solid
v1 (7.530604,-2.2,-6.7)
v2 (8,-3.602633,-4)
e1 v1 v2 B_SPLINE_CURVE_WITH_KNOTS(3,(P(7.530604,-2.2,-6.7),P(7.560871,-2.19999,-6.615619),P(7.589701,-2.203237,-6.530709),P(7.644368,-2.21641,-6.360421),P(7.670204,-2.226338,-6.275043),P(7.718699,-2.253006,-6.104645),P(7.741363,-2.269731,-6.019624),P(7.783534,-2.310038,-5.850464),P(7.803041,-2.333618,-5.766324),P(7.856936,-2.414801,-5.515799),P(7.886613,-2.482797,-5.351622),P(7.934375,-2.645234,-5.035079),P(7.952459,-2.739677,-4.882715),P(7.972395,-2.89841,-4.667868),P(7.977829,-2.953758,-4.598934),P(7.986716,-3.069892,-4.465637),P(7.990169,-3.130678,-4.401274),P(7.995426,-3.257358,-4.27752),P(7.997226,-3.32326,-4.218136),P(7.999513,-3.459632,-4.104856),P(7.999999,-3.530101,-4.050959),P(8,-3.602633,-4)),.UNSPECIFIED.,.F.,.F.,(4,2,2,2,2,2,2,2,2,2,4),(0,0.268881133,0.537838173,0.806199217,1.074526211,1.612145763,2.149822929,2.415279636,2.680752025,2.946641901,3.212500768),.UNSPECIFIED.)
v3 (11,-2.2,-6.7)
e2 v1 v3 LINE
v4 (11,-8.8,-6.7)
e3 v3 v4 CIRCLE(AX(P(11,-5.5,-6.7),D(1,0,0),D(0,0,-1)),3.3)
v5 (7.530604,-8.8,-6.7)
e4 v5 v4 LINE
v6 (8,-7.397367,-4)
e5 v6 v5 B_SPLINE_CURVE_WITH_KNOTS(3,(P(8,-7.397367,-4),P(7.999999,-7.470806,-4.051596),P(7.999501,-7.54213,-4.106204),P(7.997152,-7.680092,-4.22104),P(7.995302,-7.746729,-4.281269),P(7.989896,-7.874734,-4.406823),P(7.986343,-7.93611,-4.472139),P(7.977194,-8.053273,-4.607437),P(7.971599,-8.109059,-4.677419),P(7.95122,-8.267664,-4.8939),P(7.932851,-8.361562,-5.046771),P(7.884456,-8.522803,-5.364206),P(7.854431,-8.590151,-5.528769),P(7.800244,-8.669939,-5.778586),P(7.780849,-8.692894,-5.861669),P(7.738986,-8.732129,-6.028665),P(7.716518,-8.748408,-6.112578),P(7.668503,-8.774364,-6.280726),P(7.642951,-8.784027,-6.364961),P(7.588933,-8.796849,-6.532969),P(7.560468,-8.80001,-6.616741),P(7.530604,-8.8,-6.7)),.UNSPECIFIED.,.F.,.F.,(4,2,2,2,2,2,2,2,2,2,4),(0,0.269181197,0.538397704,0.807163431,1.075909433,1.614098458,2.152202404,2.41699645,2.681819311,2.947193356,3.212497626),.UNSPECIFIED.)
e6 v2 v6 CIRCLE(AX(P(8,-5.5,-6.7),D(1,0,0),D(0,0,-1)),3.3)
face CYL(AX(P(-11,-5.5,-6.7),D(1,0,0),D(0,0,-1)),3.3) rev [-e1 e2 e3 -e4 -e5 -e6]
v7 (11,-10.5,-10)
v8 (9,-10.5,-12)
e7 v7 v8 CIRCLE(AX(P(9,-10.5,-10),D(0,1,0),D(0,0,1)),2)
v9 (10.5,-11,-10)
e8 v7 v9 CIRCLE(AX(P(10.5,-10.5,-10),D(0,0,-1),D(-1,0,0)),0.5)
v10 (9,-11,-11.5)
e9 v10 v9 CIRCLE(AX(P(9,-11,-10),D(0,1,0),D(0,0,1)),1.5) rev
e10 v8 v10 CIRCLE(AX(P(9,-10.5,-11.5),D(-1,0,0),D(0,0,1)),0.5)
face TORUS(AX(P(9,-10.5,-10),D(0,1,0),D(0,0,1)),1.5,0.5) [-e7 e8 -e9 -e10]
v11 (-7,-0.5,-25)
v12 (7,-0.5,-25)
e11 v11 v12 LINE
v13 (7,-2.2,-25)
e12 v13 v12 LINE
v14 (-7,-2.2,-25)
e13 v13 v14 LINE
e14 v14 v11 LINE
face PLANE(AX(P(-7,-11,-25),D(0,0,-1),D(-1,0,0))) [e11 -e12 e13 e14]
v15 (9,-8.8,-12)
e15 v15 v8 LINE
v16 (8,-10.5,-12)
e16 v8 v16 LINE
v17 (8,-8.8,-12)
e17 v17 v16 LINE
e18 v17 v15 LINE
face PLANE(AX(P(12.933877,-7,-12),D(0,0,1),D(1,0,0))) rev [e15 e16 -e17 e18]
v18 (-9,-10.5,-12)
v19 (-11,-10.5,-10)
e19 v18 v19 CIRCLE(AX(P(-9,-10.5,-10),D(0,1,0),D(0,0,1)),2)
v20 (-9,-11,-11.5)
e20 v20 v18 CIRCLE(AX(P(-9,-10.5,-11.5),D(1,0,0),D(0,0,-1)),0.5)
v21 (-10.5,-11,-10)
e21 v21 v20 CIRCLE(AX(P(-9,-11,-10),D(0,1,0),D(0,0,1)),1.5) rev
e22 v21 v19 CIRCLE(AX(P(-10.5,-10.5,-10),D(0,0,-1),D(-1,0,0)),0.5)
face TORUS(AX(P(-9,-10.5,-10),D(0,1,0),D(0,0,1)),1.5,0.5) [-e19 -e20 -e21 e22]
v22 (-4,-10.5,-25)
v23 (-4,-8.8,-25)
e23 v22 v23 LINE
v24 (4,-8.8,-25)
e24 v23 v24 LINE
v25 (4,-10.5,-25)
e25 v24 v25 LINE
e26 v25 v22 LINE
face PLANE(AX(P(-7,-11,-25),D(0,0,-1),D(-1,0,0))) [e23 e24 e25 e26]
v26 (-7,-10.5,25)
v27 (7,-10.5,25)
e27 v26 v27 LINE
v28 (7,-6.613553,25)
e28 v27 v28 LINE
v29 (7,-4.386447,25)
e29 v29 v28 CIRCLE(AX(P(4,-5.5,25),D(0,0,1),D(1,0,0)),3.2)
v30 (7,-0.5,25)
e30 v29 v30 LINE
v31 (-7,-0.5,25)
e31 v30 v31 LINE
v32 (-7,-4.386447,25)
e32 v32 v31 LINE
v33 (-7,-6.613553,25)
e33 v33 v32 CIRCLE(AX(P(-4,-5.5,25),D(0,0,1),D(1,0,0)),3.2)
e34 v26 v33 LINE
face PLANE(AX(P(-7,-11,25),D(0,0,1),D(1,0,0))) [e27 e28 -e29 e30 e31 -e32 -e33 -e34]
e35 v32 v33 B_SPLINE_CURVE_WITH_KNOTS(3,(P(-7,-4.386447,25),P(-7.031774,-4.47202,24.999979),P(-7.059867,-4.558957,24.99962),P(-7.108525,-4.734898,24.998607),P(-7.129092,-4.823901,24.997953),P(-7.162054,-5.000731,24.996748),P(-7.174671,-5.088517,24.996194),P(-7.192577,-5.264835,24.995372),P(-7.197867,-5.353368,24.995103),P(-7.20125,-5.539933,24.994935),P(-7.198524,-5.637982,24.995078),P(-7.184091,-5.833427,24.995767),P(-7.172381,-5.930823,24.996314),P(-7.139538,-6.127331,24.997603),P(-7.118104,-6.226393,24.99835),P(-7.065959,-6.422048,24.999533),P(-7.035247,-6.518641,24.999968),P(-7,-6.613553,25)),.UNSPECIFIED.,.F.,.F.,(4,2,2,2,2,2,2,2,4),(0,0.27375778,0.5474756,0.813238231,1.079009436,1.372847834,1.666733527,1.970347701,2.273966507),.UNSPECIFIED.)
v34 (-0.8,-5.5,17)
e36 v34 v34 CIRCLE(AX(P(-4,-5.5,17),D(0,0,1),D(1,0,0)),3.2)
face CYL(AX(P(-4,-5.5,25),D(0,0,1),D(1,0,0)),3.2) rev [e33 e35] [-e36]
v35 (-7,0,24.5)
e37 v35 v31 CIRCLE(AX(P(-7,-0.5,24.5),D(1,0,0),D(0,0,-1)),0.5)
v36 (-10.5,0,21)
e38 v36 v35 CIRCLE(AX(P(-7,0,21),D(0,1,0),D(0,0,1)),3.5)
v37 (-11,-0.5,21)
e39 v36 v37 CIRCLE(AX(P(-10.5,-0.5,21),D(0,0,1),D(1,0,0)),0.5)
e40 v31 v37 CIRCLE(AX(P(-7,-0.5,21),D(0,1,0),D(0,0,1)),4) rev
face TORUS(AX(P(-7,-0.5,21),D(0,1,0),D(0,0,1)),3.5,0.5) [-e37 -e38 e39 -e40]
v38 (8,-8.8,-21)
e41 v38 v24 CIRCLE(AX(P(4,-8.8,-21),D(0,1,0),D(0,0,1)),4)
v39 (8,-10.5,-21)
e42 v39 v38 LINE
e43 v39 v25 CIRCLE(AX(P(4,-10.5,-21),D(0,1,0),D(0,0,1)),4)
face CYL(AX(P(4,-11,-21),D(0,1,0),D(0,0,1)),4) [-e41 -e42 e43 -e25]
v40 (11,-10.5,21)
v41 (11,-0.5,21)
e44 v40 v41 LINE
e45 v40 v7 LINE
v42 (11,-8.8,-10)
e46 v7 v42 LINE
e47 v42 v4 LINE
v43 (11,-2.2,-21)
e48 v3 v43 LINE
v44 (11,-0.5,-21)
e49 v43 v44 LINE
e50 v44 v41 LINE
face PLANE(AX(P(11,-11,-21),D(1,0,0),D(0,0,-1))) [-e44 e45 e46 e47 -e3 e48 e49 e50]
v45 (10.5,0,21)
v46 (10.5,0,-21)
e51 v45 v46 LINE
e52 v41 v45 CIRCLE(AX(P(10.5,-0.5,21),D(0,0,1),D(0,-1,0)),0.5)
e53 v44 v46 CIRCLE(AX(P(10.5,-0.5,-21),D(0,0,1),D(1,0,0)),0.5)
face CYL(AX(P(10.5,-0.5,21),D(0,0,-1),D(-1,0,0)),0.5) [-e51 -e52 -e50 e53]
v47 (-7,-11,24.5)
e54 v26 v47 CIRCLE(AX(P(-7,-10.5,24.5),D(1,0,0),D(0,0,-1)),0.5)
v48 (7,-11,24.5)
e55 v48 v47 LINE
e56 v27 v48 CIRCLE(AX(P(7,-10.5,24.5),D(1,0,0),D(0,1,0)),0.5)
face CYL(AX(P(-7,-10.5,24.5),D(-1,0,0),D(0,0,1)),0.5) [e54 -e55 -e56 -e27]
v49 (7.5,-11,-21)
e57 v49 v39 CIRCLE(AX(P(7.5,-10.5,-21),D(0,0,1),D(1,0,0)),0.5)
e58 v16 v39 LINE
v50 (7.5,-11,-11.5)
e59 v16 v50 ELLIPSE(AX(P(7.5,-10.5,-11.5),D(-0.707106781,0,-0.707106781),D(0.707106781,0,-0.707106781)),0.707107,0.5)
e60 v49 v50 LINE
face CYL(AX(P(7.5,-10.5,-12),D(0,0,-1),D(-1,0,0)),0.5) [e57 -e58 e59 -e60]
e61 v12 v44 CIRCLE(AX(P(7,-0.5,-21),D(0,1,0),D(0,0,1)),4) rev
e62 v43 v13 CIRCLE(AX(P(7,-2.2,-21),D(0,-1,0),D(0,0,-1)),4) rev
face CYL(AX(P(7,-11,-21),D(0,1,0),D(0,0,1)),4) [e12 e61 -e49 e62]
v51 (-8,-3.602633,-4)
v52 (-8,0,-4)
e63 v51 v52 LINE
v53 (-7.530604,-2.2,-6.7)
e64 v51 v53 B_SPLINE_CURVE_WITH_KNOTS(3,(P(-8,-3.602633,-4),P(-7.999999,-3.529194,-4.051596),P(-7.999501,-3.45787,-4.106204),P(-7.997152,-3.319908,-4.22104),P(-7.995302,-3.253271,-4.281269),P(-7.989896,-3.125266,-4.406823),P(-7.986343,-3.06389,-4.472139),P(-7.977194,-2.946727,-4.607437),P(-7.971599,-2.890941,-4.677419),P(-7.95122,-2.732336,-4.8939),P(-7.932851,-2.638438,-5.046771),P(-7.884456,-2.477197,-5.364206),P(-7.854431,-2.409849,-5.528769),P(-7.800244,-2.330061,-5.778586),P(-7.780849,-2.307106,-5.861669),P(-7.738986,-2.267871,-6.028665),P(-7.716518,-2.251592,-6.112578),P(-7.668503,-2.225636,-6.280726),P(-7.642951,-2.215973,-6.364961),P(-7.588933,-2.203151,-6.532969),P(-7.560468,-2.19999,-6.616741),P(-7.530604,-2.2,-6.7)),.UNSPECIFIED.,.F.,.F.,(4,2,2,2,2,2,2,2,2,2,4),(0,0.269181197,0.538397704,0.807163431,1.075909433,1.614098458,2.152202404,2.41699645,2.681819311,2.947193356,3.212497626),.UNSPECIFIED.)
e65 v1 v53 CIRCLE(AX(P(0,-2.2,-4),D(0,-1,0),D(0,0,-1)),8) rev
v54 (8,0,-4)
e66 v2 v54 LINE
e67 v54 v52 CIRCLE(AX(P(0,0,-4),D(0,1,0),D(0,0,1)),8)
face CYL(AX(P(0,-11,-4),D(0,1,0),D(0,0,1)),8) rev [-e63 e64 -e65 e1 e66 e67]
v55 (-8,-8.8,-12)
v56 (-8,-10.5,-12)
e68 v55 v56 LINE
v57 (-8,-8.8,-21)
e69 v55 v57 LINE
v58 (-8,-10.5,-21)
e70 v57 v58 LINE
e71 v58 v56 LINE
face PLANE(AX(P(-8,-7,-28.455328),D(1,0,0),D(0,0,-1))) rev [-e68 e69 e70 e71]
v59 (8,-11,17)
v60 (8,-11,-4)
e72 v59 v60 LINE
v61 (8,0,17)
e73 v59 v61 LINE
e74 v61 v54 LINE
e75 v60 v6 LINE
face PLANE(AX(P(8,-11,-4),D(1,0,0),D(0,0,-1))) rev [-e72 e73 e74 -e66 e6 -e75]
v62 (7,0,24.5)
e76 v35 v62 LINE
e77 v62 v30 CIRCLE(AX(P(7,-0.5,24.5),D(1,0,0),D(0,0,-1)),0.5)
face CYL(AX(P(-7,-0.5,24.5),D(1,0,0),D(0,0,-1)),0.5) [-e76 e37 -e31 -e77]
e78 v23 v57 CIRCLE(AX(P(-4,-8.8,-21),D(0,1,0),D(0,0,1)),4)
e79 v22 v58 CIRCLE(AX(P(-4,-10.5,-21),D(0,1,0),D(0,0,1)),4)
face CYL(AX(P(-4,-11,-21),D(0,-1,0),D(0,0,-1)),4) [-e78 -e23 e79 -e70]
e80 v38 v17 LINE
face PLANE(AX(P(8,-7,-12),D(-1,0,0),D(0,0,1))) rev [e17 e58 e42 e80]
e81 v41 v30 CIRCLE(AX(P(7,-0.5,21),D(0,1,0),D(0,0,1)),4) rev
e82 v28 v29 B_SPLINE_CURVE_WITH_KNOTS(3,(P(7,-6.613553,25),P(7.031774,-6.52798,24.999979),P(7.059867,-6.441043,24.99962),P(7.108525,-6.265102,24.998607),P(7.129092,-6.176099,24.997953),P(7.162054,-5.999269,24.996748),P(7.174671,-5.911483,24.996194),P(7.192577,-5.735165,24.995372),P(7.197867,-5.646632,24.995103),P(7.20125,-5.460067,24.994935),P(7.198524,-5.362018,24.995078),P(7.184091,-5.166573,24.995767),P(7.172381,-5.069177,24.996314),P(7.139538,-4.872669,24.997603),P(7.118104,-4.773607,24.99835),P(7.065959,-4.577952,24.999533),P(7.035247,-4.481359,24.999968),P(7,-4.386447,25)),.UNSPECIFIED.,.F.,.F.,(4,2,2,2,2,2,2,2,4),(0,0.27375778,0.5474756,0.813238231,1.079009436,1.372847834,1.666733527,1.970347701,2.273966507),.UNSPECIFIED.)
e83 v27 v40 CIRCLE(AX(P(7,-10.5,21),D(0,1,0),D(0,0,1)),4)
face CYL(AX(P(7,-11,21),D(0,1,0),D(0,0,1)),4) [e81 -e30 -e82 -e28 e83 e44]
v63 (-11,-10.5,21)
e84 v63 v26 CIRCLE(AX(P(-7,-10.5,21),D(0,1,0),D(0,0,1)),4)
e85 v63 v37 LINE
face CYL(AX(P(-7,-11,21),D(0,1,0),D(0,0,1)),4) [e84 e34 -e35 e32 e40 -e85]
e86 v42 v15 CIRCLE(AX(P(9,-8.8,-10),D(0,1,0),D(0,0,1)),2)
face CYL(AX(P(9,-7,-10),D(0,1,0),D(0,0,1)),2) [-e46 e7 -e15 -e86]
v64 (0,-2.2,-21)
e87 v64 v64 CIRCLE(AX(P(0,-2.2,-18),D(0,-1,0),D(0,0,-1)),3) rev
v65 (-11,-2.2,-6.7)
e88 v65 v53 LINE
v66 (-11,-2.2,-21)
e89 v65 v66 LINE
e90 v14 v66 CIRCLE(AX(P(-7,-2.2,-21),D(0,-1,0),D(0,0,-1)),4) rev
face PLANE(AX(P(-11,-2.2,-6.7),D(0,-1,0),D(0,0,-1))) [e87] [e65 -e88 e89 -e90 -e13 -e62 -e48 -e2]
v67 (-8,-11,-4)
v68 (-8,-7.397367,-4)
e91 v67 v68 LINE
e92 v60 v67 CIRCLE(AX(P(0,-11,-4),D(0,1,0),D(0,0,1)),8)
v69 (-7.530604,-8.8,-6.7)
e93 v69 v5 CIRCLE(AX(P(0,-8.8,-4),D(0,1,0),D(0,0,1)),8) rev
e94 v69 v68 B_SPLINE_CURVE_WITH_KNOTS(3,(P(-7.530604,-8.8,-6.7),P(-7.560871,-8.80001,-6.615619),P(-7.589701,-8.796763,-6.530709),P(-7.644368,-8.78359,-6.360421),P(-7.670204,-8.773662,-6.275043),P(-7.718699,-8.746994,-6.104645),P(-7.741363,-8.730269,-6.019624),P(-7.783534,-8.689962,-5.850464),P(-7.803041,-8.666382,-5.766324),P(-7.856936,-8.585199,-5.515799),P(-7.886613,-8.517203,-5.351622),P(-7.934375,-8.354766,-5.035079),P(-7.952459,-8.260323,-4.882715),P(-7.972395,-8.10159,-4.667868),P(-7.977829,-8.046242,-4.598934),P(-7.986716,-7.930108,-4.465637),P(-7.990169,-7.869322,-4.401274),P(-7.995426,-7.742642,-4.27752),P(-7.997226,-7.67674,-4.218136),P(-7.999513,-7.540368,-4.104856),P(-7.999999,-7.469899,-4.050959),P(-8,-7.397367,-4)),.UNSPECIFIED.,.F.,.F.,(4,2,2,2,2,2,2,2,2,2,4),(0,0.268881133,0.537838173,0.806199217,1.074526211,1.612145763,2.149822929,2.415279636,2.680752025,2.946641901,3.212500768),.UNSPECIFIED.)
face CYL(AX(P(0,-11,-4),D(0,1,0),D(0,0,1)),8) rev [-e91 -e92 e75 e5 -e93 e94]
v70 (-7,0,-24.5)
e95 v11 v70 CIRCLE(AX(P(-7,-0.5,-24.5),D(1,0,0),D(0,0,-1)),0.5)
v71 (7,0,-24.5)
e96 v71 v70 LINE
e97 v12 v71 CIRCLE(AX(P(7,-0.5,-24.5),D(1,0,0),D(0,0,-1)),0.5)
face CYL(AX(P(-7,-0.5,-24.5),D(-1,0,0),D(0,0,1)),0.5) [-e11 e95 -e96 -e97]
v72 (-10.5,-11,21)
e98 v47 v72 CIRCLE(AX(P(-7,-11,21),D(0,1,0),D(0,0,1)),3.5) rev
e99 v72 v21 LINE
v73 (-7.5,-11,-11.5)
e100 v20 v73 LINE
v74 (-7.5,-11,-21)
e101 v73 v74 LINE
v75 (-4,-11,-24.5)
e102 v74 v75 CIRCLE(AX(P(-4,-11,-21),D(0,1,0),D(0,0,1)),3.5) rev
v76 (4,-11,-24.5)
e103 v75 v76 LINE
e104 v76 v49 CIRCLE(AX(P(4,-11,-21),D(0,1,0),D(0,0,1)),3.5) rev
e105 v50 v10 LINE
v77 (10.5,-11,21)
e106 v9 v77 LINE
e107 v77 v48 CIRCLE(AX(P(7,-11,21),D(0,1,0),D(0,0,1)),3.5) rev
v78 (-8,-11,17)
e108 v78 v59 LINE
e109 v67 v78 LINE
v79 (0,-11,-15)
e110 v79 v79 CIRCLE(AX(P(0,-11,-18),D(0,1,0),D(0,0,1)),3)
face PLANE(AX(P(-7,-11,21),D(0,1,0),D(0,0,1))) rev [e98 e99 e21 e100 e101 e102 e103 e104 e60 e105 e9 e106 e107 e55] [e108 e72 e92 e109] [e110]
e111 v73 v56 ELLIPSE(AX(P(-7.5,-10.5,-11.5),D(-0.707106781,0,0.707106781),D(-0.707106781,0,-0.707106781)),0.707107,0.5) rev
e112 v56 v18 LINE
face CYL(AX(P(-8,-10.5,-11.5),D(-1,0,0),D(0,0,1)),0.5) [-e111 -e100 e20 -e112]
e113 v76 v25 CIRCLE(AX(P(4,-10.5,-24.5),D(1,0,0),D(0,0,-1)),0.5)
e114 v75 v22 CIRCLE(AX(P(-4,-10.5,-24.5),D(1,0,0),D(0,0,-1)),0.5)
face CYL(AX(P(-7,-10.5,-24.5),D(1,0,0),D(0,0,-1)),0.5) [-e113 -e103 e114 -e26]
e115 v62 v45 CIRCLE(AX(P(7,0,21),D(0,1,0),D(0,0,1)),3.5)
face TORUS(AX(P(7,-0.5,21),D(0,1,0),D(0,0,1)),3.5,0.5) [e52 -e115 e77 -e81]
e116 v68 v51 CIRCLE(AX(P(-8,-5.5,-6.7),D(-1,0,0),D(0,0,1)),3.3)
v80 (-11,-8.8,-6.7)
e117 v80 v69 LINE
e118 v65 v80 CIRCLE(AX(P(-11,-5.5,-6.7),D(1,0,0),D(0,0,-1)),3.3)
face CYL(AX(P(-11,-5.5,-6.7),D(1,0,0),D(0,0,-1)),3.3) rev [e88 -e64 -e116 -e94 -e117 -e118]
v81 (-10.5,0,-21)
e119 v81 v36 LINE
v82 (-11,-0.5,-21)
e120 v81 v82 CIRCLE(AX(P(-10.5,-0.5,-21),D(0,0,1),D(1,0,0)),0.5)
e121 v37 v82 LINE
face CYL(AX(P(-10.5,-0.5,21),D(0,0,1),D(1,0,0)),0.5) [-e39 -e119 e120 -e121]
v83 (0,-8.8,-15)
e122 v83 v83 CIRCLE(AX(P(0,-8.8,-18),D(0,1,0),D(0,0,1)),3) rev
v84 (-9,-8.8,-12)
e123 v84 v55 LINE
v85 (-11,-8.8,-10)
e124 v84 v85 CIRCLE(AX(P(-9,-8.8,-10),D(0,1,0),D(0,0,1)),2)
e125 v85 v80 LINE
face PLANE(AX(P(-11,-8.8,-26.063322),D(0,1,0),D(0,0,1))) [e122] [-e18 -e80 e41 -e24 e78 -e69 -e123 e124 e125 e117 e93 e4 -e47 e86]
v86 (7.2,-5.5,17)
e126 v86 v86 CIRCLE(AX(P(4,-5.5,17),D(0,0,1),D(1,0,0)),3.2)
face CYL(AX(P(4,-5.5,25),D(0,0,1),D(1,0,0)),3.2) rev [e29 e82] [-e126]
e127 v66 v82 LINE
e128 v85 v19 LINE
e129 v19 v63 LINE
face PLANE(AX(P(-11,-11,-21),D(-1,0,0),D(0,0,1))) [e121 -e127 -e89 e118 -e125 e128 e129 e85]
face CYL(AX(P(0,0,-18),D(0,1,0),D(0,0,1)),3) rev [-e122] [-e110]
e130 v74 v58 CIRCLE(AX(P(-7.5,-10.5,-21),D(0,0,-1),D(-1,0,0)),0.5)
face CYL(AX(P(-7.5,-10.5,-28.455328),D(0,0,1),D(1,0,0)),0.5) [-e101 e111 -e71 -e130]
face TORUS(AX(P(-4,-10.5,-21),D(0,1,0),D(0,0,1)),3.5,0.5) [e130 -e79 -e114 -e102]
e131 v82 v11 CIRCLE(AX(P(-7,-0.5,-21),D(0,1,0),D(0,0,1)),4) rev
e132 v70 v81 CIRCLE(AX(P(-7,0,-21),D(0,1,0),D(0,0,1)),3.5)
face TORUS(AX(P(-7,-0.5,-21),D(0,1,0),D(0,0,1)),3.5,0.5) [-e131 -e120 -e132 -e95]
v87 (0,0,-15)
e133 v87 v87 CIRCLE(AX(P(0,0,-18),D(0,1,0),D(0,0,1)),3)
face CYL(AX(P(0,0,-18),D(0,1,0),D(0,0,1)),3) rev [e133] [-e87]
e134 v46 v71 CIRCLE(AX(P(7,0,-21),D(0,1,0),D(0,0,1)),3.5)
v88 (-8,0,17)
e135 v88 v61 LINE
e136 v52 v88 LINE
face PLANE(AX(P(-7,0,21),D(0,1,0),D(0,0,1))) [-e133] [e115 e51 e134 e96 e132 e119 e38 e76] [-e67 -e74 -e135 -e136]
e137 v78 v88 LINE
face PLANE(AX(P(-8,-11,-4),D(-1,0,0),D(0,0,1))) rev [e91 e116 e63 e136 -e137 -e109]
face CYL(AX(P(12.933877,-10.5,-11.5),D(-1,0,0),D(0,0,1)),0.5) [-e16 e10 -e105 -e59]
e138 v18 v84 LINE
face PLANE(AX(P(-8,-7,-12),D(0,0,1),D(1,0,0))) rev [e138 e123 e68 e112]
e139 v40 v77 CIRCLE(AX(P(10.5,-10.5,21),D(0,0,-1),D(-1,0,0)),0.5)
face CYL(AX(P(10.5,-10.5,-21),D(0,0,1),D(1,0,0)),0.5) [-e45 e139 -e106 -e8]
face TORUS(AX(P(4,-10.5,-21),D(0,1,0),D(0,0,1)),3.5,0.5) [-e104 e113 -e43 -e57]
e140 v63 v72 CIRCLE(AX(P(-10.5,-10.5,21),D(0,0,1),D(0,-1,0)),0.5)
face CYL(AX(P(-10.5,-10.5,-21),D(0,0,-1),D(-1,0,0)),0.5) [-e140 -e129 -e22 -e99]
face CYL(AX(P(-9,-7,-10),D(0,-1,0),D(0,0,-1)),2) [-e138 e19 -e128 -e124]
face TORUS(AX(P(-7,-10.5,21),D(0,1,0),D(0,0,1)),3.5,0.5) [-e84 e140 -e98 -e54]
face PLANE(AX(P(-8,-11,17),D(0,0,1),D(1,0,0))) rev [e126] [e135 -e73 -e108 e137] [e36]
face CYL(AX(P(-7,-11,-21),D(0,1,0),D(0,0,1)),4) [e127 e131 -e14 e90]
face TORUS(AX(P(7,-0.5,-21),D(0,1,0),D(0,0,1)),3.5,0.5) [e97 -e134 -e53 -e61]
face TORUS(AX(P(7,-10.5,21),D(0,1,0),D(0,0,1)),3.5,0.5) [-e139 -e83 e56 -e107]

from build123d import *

# Parameters (mm, degrees)
SALIENTE_EXTRUIR1_DEPTH         = 11
DI_METRO_DE_TALADRO_6_0_6_1_D   = 6
CORTAR_EXTRUIR1_DEPTH           = 36.071355834
CROQUIS6_W                      = 4.933877459
CROQUIS6_H                      = 16.455327893
CROQUIS6_W_2                    = 4.832675104
CORTAR_EXTRUIR5_DEPTH           = 4
REDONDEO1_R                     = 4
REDONDEO2_R                     = 4
REDONDEO3_R                     = 2
REDONDEO4_R                     = 0.5
DI_METRO_DE_TALADRO_6_4_6_4_1_D = 6.4


with BuildPart() as part:
    # Croquis1 → Saliente-Extruir1 (new body)
    with BuildSketch(Plane(origin=(0, 0, 0), x_dir=(1, 0, 0), z_dir=(0, 1, 0))):
        with BuildLine():
            Line((-7, 25), (7, 25))
            ThreePointArc((7, 25), (9.828427125, 23.828427125), (11, 21))
            Line((11, 21), (11, -21))
            ThreePointArc((11, -21), (9.828427125, -23.828427125), (7, -25))
            Line((7, -25), (-7, -25))
            ThreePointArc((-7, -25), (-9.828427125, -23.828427125), (-11, -21))
            Line((-11, -21), (-11, 21))
            ThreePointArc((-11, 21), (-9.828427125, 23.828427125), (-7, 25))
        make_face()
        with BuildLine():
            Line((-8, -17), (8, -17))
            Line((8, -17), (8, 4))
            ThreePointArc((8, 4), (0, 12), (-8, 4))
            Line((-8, 4), (-8, -17))
        make_face(mode=Mode.SUBTRACT)
    extrude(amount=-SALIENTE_EXTRUIR1_DEPTH)

    # Diámetro de taladro Ø6.0 (6)1 (through all)
    with Locations(Plane(origin=(0, 0, 0), x_dir=(1, 0, 0), z_dir=(0, 1, 0))):
        with Locations((0, 18)):
            Hole(DI_METRO_DE_TALADRO_6_0_6_1_D / 2)

    # Croquis5 → Cortar-Extruir1 (cut, through all)
    with BuildSketch(Plane(origin=(11, 0, 0), x_dir=(0, 0, -1), z_dir=(1, 0, 0))):
        with BuildLine():
            Line((6.7, -2.2), (26.063321608, -2.2))
            Line((26.063321608, -2.2), (26.063321608, -8.8))
            Line((26.063321608, -8.8), (6.7, -8.8))
            ThreePointArc((6.7, -8.8), (3.4, -5.5), (6.7, -2.2))
        make_face()
    extrude(amount=-CORTAR_EXTRUIR1_DEPTH, mode=Mode.SUBTRACT)

    # Croquis6 → Cortar-Extruir5 (cut)
    with BuildSketch(Plane.XZ.offset(11)):
        with Locations((10.46693873, -20.227663947)):
            Rectangle(CROQUIS6_W, CROQUIS6_H)
        with Locations((-10.416337552, -20.227663947)):
            Rectangle(CROQUIS6_W_2, CROQUIS6_H)
    extrude(amount=-CORTAR_EXTRUIR5_DEPTH, mode=Mode.SUBTRACT)

    # Redondeo1
    # the kernel refuses this fillet: 4 mm, written as the material it takes off along each edge
    with BuildSketch(Plane(origin=(8, -21.005040364, -24.872983346), x_dir=(-0.9994962175029386, 0, -0.031738166256391975), z_dir=(0, 1, 0))) as redondeo1_piece_1:
        with BuildLine():
            CenterArc((3.875063481, 3.99798487), REDONDEO1_R, 181.818768407, 90)
            Line((-0.122921389, 3.871032205), (-0.522719876, 3.858336938))
            Line((-0.522719876, 3.858336938), (-0.399798487, -0.012695267))
            Line((-0.399798487, -0.012695267), (-0.087657483, -0.390277037))
            ThreePointArc((-0.087657483, -0.390277037), (1.01622276, -0.495012986), (4.014711412, -0.399798487))
            Line((4.014711412, -0.399798487), (4.002016146, 0))
        make_face()
    extrude(amount=12.205040364, mode=Mode.SUBTRACT)

    # Redondeo2
    # the kernel refuses this fillet: 4 mm, written as the material it takes off along each edge
    with BuildSketch(Plane(origin=(-8, -21.005040364, -24.872983346), x_dir=(0, 0, 1), z_dir=(0, 1, 0))) as redondeo2_piece_1:
        with BuildLine():
            CenterArc((3.872983346, 4), REDONDEO2_R, 180, 90)
            Line((-0.127016654, 4), (-0.527016654, 4))
            ThreePointArc((-0.527016654, 4), (-0.527016654, 1), (-0.387298335, -0.1))
            Line((-0.387298335, -0.1), (0, -0.4))
            Line((0, -0.4), (3.872983346, -0.4))
            Line((3.872983346, -0.4), (3.872983346, 0))
        make_face()
    extrude(amount=12.205040364, mode=Mode.SUBTRACT)

    # Redondeo3
    redondeo3_edges = [part.edges().sort_by_distance(p)[0] for p in [
        (-11, -9.9, -12),
        (11, -9.9, -12),
    ]]
    fillet(redondeo3_edges, radius=REDONDEO3_R)

    # Redondeo4
    redondeo4_edges = [part.edges().sort_by_distance(p)[0] for p in [
        (9.828427125, -11, 23.828427125),
        (0, 0, 25),
        (-9.828427125, 0, 23.828427125),
        (-8.5, -11, -12),
        (0, -11, -25),
        (6.828427125, -11, -23.828427125),
        (-8, -11, -16.5),
        (11, -11, 5.5),
        (-6.828427125, -11, -23.828427125),
        (-11, -11, 5.5),
        (8.5, -11, -12),
        (10.414213562, -11, -11.414213562),
        (-10.414213562, -11, -11.414213562),
        (-9.828427125, -11, 23.828427125),
        (0, -11, 25),
        (-11, 0, 0),
        (-9.828427125, 0, -23.828427125),
        (0, 0, -25),
        (8, -11, -16.5),
        (9.828427125, 0, -23.828427125),
        (11, 0, 0),
        (9.828427125, 0, 23.828427125),
    ]]
    fillet(redondeo4_edges, radius=REDONDEO4_R)

    # Diámetro de taladro Ø6.4 (6.4)1 (through all)
    with Locations(Plane.XY.offset(25)):
        with Locations((-4, -5.5), (4, -5.5)):
            Hole(DI_METRO_DE_TALADRO_6_4_6_4_1_D / 2)


solid = part.part
